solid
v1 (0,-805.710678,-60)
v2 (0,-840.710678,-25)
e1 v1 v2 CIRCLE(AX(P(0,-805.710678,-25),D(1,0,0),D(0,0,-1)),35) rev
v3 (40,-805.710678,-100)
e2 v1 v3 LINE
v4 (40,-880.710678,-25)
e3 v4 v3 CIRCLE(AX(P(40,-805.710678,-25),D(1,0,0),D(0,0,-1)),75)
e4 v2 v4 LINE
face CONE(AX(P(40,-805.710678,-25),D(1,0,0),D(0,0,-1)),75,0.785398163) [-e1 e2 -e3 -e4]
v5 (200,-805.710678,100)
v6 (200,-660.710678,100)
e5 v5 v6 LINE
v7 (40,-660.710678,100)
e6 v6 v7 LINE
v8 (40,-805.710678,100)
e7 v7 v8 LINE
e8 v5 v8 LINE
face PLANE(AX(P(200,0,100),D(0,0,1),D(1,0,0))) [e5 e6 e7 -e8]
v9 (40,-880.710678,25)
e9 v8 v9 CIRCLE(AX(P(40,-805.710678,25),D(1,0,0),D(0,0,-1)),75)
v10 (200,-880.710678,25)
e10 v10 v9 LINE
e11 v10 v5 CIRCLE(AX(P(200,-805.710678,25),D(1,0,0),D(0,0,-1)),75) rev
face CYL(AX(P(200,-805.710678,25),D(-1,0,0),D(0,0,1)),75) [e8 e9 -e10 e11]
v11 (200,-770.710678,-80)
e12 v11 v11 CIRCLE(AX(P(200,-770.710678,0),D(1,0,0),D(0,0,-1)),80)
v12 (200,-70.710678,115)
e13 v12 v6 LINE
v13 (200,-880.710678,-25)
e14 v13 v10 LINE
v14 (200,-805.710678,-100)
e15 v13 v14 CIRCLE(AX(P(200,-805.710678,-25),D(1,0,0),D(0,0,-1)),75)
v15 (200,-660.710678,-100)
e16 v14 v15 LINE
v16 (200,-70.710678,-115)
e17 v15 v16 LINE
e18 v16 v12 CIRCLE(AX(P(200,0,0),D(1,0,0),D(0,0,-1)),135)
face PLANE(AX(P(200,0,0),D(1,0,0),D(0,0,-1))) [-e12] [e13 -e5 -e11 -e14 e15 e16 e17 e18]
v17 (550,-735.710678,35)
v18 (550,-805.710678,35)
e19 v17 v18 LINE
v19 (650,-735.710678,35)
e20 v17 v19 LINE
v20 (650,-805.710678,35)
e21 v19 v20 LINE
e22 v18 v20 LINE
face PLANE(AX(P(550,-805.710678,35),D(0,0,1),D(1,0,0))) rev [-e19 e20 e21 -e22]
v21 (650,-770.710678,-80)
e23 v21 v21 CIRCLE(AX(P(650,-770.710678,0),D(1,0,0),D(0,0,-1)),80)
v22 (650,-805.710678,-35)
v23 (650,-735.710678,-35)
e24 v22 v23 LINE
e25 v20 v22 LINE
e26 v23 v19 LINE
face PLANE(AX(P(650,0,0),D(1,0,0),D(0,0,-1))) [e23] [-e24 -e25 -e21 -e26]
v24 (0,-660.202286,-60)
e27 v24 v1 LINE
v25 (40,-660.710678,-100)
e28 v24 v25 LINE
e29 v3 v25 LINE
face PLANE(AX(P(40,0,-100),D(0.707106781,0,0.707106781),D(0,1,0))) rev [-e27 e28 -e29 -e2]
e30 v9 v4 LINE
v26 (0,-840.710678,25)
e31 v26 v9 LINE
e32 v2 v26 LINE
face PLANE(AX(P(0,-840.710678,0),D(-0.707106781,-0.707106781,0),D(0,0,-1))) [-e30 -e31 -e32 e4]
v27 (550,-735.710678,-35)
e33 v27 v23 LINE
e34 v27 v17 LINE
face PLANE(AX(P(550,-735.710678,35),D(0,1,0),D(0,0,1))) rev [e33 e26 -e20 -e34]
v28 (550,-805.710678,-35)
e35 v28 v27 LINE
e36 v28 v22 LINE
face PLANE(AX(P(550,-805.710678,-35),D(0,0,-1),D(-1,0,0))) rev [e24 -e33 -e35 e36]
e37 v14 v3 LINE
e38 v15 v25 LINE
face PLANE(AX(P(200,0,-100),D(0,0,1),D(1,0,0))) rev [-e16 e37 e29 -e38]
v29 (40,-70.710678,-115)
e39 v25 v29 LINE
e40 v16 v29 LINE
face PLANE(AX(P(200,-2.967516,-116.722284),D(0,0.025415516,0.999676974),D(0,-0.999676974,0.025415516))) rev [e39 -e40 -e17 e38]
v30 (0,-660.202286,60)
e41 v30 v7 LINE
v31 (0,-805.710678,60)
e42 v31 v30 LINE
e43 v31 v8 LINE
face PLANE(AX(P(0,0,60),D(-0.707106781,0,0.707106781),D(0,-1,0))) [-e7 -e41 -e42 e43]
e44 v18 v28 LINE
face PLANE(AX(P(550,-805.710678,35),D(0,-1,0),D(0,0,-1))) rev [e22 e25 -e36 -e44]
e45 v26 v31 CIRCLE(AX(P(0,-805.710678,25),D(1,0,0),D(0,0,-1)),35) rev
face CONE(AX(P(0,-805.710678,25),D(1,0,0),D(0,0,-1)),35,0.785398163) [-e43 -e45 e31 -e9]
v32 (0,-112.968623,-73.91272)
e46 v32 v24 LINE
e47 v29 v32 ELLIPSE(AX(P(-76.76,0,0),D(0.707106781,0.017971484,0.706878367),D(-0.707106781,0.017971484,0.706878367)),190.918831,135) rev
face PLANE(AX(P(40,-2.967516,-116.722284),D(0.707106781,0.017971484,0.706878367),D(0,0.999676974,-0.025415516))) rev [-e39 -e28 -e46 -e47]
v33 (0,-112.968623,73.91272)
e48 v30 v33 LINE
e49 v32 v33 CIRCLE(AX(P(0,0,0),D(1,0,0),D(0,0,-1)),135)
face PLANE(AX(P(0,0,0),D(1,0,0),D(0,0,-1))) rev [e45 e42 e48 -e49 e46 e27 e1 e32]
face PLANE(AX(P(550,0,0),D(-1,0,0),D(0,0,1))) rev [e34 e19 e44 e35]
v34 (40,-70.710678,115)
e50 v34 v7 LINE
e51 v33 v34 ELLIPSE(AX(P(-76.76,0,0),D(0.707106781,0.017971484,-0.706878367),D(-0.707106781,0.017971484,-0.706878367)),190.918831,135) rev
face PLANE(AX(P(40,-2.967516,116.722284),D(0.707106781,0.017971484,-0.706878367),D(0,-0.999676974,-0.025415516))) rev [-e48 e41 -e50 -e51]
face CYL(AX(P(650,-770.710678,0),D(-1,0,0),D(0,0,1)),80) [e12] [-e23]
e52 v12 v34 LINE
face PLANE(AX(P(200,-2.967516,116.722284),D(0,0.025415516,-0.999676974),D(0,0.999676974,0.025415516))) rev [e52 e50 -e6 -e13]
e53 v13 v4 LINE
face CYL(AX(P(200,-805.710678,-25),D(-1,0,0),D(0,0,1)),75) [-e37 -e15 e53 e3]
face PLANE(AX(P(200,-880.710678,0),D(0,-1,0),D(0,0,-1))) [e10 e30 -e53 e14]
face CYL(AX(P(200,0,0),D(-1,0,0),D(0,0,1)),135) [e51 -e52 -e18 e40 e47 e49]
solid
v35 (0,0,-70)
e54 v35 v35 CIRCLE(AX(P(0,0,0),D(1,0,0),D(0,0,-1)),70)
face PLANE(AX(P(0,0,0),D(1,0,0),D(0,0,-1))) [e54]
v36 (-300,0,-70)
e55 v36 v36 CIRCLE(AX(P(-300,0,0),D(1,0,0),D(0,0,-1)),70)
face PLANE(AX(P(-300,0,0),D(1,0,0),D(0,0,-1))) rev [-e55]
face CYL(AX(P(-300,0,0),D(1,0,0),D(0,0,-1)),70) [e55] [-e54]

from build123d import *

# Parameters (mm, degrees)
ESQUISSE1_R             = 80
BOSS_EXTRU_1_DEPTH      = 200
BOSS_EXTRU_3_DEPTH      = 650
ESQUISSE4_W             = 70
ESQUISSE4_H             = 70
ENL_V_MAT_EXTRU_4_DEPTH = 100
ESQUISSE1_6_R           = 70
BOSS_EXTRU_4_DEPTH      = 300
CHANFREIN1_SIZE         = 40


with BuildPart() as part:
    # Esquisse1 → Boss.-Extru.1 (new body)
    with BuildSketch(Plane(origin=(0, 0, 0), x_dir=(0, 0, -1), z_dir=(1, 0, 0))):
        with BuildLine():
            ThreePointArc((115, -70.710678119), (0, 135), (-115, -70.710678119))
            Line((-115, -70.710678119), (-100, -660.710678119))
            Line((-100, -660.710678119), (-100, -805.710678119))
            ThreePointArc((-100, -805.710678119), (-78.033008589, -858.743686708), (-25, -880.710678119))
            Line((-25, -880.710678119), (25, -880.710678119))
            ThreePointArc((25, -880.710678119), (78.033008589, -858.743686708), (100, -805.710678119))
            Line((100, -805.710678119), (100, -660.710678119))
            Line((100, -660.710678119), (115, -70.710678119))
        make_face()
        with Locations((0, -770.710678119)):
            Circle(ESQUISSE1_R, mode=Mode.SUBTRACT)
    extrude(amount=BOSS_EXTRU_1_DEPTH)

    # Esquisse1<5> → Boss.-Extru.3 (add)
    with BuildSketch(Plane(origin=(0, 0, 0), x_dir=(0, 0, -1), z_dir=(1, 0, 0))):
        with BuildLine():
            ThreePointArc((80, -770.710678119), (0, -690.710678119), (-80, -770.710678119))
            Line((-80, -770.710678119), (80, -770.710678119))
        make_face()
        with BuildLine():
            Line((80, -770.710678119), (-80, -770.710678119))
            ThreePointArc((-80, -770.710678119), (0, -850.710678119), (80, -770.710678119))
        make_face()
    extrude(amount=BOSS_EXTRU_3_DEPTH)

    # Esquisse4 → Enlèv. mat.-Extru.4 (cut)
    with BuildSketch(Plane(origin=(650, 0, 0), x_dir=(0, 0, -1), z_dir=(1, 0, 0))):
        with Locations((0, -770.710678119)):
            Rectangle(ESQUISSE4_W, ESQUISSE4_H)
    extrude(amount=-ENL_V_MAT_EXTRU_4_DEPTH, mode=Mode.SUBTRACT)

    # Chanfrein1
    # the kernel refuses this chamfer: 40 mm, written as the material it takes off along each edge
    with BuildSketch(Plane(origin=(0, -805.710678119, -25), x_dir=(0, -1, 0), z_dir=(0, 0, 1))) as chanfrein1_piece_1:
        Polygon((75, CHANFREIN1_SIZE), (75 - CHANFREIN1_SIZE, 0), (75, 0), align=None)
    revolve(axis=Axis((0, -805.710678119, -25), (1, 0, 0)), revolution_arc=90, mode=Mode.SUBTRACT)
    with BuildSketch(Plane(origin=(0, -880.710678119, 25), x_dir=(0, 1, 0), z_dir=(0, 0, -1))) as chanfrein1_piece_2:
        Polygon((CHANFREIN1_SIZE, 0), (0, CHANFREIN1_SIZE), (0, 0), align=None)
    extrude(amount=50, mode=Mode.SUBTRACT)
    with BuildSketch(Plane(origin=(0, -805.710678119, 25), x_dir=(0, 0, 1), z_dir=(0, 1, 0))) as chanfrein1_piece_3:
        Polygon((75 - CHANFREIN1_SIZE, 0), (75, CHANFREIN1_SIZE), (75, 0), align=None)
    revolve(axis=Axis((0, -805.710678119, 25), (1, 0, 0)), revolution_arc=90, mode=Mode.SUBTRACT)
    with BuildSketch(Plane(origin=(0, -557.8433586, 100), x_dir=(0, 0, -1), z_dir=(0, -1, 0))) as chanfrein1_piece_4_section:
        Polygon((CHANFREIN1_SIZE, 0), (0, CHANFREIN1_SIZE), (0, 0), align=None)
    chanfrein1_piece_4 = extrude(amount=247.867319519, mode=Mode.PRIVATE)
    chanfrein1_piece_4 = split(chanfrein1_piece_4, bisect_by=Plane(origin=(18.692786983, -557.368271768, 81.313251281), z_dir=(-0.7071067811865477, -0.01797148390738359, 0.7068783670237524)), keep=Keep.TOP, mode=Mode.PRIVATE)
    add(chanfrein1_piece_4, mode=Mode.SUBTRACT)
    with BuildSketch(Plane(origin=(0, 32.123412539, 117.614426034), x_dir=(0, 0.025415516277791695, -0.999676973593137), z_dir=(0, -0.9996769735931369, -0.02541551627779169))) as chanfrein1_piece_5_section:
        Polygon((CHANFREIN1_SIZE, 0), (0, CHANFREIN1_SIZE), (0, 0), align=None)
    chanfrein1_piece_5 = extrude(amount=795.925286201, mode=Mode.PRIVATE)
    chanfrein1_piece_5 = chanfrein1_piece_5 - Plane(origin=(0, 0, 0), x_dir=(0, -0.5237828008789241, -0.851851851851852), z_dir=(-1, 0, 0)) * Cylinder(135, 1752, mode=Mode.PRIVATE)
    chanfrein1_piece_5 = split(chanfrein1_piece_5, bisect_by=Plane(origin=(28.807213017, 32.123412539, 88.807213017), z_dir=(-0.7071067811865476, 0, 0.7071067811865476)), keep=Keep.TOP, mode=Mode.PRIVATE)
    add(chanfrein1_piece_5, mode=Mode.SUBTRACT)
    with BuildSketch(Plane(origin=(0, -763.544768777, -97.385573966), x_dir=(1, 0, 0), z_dir=(0, 0.9996769735931369, -0.02541551627779147))) as chanfrein1_piece_6_section:
        Polygon((CHANFREIN1_SIZE, 0), (0, -CHANFREIN1_SIZE), (0, 0), align=None)
    chanfrein1_piece_6 = extrude(amount=795.925286201, mode=Mode.PRIVATE)
    chanfrein1_piece_6 = chanfrein1_piece_6 - Plane(origin=(0, 0, 0), x_dir=(0, -0.5237828008789241, -0.851851851851852), z_dir=(-1, 0, 0)) * Cylinder(135, 1752, mode=Mode.PRIVATE)
    chanfrein1_piece_6 = split(chanfrein1_piece_6, bisect_by=Plane(origin=(18.692786983, -763.544768777, -78.692786983), z_dir=(-0.7071067811865476, 0, -0.7071067811865476)), keep=Keep.TOP, mode=Mode.PRIVATE)
    add(chanfrein1_piece_6, mode=Mode.SUBTRACT)
    with BuildSketch(Plane(origin=(0, -805.710678119, -100), x_dir=(1, 0, 0), z_dir=(0, 1, 0))) as chanfrein1_piece_7_section:
        Polygon((CHANFREIN1_SIZE, 0), (0, -CHANFREIN1_SIZE), (0, 0), align=None)
    chanfrein1_piece_7 = extrude(amount=247.867319519, mode=Mode.PRIVATE)
    chanfrein1_piece_7 = split(chanfrein1_piece_7, bisect_by=Plane(origin=(21.84262493, -805.155536529, -78.164430815), z_dir=(-0.7071067811865477, -0.017971483907383432, -0.7068783670237524)), keep=Keep.TOP, mode=Mode.PRIVATE)
    add(chanfrein1_piece_7, mode=Mode.SUBTRACT)


with BuildPart() as body_2:
    # Esquisse1<6> → Boss.-Extru.4 (new body)
    with BuildSketch(Plane(origin=(0, 0, 0), x_dir=(0, 0, -1), z_dir=(1, 0, 0))):
        Circle(ESQUISSE1_6_R)
    extrude(amount=-BOSS_EXTRU_4_DEPTH)


solid = Compound([part.part, body_2.part])
